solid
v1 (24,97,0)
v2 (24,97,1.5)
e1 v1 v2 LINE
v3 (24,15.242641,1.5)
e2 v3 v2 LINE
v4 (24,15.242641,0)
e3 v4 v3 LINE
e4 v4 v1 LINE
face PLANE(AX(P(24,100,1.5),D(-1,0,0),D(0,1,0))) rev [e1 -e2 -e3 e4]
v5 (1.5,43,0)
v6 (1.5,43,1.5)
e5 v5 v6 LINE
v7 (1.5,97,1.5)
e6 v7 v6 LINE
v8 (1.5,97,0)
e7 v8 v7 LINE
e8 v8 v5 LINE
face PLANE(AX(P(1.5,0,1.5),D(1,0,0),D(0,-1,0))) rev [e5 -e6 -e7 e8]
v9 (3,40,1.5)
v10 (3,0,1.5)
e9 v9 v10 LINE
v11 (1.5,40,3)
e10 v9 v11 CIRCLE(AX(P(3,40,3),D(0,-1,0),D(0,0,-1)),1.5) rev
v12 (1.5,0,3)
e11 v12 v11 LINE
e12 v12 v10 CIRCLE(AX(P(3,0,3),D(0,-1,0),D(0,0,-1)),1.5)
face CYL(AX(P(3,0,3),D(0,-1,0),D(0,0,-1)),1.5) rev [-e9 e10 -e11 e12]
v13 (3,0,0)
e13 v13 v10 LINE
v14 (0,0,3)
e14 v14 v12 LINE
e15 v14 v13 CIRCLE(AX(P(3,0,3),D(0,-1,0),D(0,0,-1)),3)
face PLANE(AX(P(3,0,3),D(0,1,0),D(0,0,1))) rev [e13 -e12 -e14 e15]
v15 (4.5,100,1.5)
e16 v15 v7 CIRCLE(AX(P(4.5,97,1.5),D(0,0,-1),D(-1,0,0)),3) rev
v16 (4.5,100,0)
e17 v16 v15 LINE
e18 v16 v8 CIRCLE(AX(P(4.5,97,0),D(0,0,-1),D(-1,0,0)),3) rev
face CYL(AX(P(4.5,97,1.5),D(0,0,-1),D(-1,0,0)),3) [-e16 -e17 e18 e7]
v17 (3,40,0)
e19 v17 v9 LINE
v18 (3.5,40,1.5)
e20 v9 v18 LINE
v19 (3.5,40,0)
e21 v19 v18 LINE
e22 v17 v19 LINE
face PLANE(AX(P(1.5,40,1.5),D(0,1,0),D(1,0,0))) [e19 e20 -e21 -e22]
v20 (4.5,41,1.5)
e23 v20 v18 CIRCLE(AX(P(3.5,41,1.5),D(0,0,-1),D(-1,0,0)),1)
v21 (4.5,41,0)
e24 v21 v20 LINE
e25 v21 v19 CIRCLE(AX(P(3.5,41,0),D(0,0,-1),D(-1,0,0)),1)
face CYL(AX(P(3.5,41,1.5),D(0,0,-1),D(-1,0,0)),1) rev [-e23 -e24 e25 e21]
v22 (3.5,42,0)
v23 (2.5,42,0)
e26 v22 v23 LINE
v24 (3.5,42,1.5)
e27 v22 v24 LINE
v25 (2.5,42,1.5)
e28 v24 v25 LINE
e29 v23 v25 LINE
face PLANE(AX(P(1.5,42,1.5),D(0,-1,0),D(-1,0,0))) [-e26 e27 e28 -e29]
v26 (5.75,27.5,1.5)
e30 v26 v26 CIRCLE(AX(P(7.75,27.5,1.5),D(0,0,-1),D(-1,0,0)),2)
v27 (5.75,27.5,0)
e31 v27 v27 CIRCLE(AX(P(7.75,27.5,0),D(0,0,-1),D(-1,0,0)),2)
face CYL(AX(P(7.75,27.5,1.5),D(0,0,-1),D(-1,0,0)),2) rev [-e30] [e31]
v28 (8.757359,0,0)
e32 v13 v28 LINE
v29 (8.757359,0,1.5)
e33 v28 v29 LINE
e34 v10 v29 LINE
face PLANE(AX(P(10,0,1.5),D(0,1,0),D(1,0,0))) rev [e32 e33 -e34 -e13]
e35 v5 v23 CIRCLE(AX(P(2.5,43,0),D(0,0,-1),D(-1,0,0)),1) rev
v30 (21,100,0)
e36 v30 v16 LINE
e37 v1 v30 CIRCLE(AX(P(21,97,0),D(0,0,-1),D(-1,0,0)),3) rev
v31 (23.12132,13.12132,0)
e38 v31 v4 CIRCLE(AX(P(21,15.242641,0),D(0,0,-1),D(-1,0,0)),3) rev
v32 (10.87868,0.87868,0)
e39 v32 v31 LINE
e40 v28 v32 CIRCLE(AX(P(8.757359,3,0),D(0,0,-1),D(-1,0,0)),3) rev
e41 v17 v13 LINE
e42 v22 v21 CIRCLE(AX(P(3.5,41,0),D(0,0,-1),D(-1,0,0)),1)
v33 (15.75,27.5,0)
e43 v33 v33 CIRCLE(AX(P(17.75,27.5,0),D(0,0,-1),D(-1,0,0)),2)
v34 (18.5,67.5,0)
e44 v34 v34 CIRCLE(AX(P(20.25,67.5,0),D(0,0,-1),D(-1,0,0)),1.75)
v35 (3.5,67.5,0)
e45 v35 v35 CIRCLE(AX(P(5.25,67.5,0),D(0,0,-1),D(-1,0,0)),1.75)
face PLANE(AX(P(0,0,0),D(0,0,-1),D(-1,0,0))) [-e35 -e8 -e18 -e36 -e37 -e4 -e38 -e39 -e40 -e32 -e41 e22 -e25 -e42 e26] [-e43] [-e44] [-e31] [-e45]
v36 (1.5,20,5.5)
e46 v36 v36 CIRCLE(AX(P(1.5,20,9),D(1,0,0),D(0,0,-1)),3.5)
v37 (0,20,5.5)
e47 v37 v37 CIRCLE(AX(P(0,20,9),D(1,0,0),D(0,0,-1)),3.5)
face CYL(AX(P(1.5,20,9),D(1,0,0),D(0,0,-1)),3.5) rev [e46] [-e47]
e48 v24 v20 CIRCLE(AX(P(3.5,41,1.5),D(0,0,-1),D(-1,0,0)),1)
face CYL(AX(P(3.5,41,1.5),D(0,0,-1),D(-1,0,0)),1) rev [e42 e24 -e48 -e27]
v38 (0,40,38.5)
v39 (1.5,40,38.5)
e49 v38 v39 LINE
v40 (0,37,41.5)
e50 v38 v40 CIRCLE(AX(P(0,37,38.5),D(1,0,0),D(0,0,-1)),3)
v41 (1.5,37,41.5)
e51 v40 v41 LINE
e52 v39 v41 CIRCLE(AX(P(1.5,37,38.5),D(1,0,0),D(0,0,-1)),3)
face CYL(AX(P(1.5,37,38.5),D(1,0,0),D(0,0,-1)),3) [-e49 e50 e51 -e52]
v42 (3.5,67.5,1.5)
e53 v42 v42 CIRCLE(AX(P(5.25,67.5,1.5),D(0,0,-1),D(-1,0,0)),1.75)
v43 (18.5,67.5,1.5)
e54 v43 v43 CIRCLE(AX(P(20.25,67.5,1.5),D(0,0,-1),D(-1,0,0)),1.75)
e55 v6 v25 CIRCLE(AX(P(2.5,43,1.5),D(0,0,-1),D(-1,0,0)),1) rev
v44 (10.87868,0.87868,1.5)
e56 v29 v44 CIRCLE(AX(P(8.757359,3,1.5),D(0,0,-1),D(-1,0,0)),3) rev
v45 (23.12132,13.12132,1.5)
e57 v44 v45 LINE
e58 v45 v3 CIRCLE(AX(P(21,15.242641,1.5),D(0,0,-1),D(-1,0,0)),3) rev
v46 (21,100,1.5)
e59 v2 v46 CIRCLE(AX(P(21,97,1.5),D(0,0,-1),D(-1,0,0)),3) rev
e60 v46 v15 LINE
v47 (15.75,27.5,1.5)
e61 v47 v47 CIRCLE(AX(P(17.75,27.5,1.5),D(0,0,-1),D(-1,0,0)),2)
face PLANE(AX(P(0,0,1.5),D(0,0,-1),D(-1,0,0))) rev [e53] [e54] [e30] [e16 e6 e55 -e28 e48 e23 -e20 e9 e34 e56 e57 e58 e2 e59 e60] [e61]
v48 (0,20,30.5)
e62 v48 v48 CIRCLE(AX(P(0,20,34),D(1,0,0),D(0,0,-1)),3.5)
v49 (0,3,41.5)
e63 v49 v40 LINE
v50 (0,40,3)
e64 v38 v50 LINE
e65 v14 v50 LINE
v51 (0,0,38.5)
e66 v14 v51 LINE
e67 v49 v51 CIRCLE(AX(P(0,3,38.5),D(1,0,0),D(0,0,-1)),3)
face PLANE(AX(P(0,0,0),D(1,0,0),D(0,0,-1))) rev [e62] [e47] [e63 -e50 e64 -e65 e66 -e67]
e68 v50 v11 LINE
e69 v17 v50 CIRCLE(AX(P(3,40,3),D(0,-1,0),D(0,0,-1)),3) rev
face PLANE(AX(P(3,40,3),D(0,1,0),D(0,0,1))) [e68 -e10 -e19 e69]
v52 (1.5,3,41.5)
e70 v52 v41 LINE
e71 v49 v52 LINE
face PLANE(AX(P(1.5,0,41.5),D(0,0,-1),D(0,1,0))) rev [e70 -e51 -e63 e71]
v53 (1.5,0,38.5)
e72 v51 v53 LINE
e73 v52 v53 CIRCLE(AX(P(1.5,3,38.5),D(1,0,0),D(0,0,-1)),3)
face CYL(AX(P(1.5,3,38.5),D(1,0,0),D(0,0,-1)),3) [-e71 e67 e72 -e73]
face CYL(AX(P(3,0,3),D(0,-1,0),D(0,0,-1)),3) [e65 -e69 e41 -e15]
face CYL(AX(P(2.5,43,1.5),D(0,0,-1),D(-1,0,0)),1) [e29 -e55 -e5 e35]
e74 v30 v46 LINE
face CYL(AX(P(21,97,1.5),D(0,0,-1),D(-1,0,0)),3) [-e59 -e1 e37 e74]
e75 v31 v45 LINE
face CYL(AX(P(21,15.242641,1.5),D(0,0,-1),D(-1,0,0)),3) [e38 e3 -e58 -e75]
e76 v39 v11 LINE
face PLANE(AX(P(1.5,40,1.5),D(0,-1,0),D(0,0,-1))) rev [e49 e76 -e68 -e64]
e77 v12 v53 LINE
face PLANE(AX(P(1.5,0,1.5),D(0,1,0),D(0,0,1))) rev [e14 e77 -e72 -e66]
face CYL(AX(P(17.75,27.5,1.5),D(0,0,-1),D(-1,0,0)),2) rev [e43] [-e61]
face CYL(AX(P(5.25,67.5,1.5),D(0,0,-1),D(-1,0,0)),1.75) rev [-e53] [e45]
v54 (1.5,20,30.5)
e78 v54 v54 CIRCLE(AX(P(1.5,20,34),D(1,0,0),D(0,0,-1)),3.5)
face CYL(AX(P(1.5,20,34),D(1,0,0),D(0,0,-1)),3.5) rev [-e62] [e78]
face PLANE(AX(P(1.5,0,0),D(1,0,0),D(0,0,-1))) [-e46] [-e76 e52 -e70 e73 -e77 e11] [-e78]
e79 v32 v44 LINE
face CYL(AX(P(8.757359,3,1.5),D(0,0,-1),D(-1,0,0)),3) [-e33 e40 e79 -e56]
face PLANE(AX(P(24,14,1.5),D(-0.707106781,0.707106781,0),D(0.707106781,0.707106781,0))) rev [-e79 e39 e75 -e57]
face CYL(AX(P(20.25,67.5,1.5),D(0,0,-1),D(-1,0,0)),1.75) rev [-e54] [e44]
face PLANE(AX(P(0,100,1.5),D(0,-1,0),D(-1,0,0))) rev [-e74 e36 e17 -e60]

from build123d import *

# Parameters (mm, degrees)
BOSS_EXTRU_1_DEPTH           = 1.5
ESQUISSE2_W                  = 40
ESQUISSE2_H                  = 40
BOSS_EXTRU_2_DEPTH           = 1.5
ENL_V_MAT_EXTRU_1_DEPTH      = 111.344913793
ENL_V_MAT_EXTRU_1_DEPTH_BACK = 111.344913793
ESQUISSE3_W                  = 1.5
ESQUISSE3_H                  = 60
ENL_V_MAT_EXTRU_2_DEPTH      = 111.344913793
ENL_V_MAT_EXTRU_2_DEPTH_BACK = 111.344913793
ESQUISSE4_R                  = 1.75
ESQUISSE4_R_2                = 2
ENL_V_MAT_EXTRU_3_DEPTH      = 111.582548352
ENL_V_MAT_EXTRU_3_DEPTH_BACK = 111.582548352
ESQUISSE5_R                  = 3.5
ESQUISSE14_W                 = 3
ESQUISSE14_H                 = 2
ENL_V_MAT_EXTRU_4_DEPTH      = 111.344913793
CONG_4_R                     = 1
CONG_5_R                     = 3
CONVERTIR_VOLUME2_DEPTH      = 40
CONVERTIR_VOLUME2_2_DEPTH    = 40


# Read off the part's stored shape, not the designer's step: Convertir-Volume2
with BuildPart() as part:
    # Esquisse1 → Boss.-Extru.1 (new body)
    with BuildSketch(Plane.XY):
        Polygon((0, 0), (0, 100), (24, 100), (24, 14), (10, 0), align=None)
    extrude(amount=BOSS_EXTRU_1_DEPTH)

    # Esquisse2 → Boss.-Extru.2 (add)
    with BuildSketch(Plane.ZY):
        with Locations((21.5, 20)):
            Rectangle(ESQUISSE2_W, ESQUISSE2_H)
    extrude(amount=-BOSS_EXTRU_2_DEPTH)

    # Esquisse3 → Enlèv. mat.-Extru.1 (cut, two sides: drawn at the far end of the back side and taken through both)
    with BuildSketch(Plane.XY.offset(1.5).offset(-ENL_V_MAT_EXTRU_1_DEPTH_BACK)):
        with Locations((0.75, 70)):
            Rectangle(ESQUISSE3_W, ESQUISSE3_H)
    extrude(amount=ENL_V_MAT_EXTRU_1_DEPTH + ENL_V_MAT_EXTRU_1_DEPTH_BACK, mode=Mode.SUBTRACT)

    # Esquisse4 → Enlèv. mat.-Extru.2 (cut, two sides: drawn at the far end of the back side and taken through both)
    with BuildSketch(Plane.XY.offset(1.5).offset(-ENL_V_MAT_EXTRU_2_DEPTH_BACK)):
        with Locations((5.25, 67.5)):
            Circle(ESQUISSE4_R)
        with Locations(Location((20.25, 67.5, 0), (0, 0, 180))):
            Circle(ESQUISSE4_R)
        with Locations((7.75, 27.5)):
            Circle(ESQUISSE4_R_2)
        with Locations(Location((17.75, 27.5, 0), (0, 0, 180))):
            Circle(ESQUISSE4_R_2)
    extrude(amount=ENL_V_MAT_EXTRU_2_DEPTH + ENL_V_MAT_EXTRU_2_DEPTH_BACK, mode=Mode.SUBTRACT)

    # Esquisse5 → Enlèv. mat.-Extru.3 (cut, two sides: drawn at the far end of the back side and taken through both)
    with BuildSketch(Plane(origin=(1.5, 0, 0), x_dir=(0, 0, -1), z_dir=(1, 0, 0)).offset(-ENL_V_MAT_EXTRU_3_DEPTH_BACK)):
        with Locations((-34, 20)):
            Circle(ESQUISSE5_R)
        with Locations((-9, 20)):
            Circle(ESQUISSE5_R)
    extrude(amount=ENL_V_MAT_EXTRU_3_DEPTH + ENL_V_MAT_EXTRU_3_DEPTH_BACK, mode=Mode.SUBTRACT)

    # Esquisse14 → Enlèv. mat.-Extru.4 (cut, through all)
    with BuildSketch(Plane.XY.offset(1.5)):
        with Locations((3, 41)):
            Rectangle(ESQUISSE14_W, ESQUISSE14_H)
    extrude(amount=-ENL_V_MAT_EXTRU_4_DEPTH, mode=Mode.SUBTRACT)

    # Congé4
    cong_4_edges = [part.edges().sort_by_distance(p)[0] for p in [
        (1.5, 42, 0.75),
        (4.5, 42, 0.75),
        (4.5, 40, 0.75),
    ]]
    fillet(cong_4_edges, radius=CONG_4_R - 0.0001)  # a hair under: the kernel refuses the full size

    # Congé5
    cong_5_edges = [part.edges().sort_by_distance(p)[0] for p in [
        (0.75, 40, 41.5),
        (0.75, 0, 41.5),
        (1.5, 100, 0.75),
        (24, 100, 0.75),
        (24, 14, 0.75),
        (10, 0, 0.75),
    ]]
    fillet(cong_5_edges, radius=CONG_5_R)

    # Convertir-Volume2 outline → Convertir-Volume2 (cut)
    with BuildSketch(Plane(origin=(0, 0, 0), x_dir=(1, 0, 0), z_dir=(0, 1, 0))):
        with BuildLine():
            Line((0, 0), (0, -3))
            ThreePointArc((0, -3), (0.878679656, -0.878679656), (3, 0))
            Line((3, 0), (0, 0))
        make_face()
    extrude(amount=CONVERTIR_VOLUME2_DEPTH, mode=Mode.SUBTRACT)

    # Convertir-Volume2 2 outline → Convertir-Volume2 2 (add)
    with BuildSketch(Plane(origin=(0, 0, 0), x_dir=(1, 0, 0), z_dir=(0, 1, 0))):
        with BuildLine():
            Line((1.5, -1.5), (1.5, -3))
            ThreePointArc((1.5, -3), (1.939339828, -1.939339828), (3, -1.5))
            Line((3, -1.5), (1.5, -1.5))
        make_face()
    extrude(amount=CONVERTIR_VOLUME2_2_DEPTH)


solid = part.part
